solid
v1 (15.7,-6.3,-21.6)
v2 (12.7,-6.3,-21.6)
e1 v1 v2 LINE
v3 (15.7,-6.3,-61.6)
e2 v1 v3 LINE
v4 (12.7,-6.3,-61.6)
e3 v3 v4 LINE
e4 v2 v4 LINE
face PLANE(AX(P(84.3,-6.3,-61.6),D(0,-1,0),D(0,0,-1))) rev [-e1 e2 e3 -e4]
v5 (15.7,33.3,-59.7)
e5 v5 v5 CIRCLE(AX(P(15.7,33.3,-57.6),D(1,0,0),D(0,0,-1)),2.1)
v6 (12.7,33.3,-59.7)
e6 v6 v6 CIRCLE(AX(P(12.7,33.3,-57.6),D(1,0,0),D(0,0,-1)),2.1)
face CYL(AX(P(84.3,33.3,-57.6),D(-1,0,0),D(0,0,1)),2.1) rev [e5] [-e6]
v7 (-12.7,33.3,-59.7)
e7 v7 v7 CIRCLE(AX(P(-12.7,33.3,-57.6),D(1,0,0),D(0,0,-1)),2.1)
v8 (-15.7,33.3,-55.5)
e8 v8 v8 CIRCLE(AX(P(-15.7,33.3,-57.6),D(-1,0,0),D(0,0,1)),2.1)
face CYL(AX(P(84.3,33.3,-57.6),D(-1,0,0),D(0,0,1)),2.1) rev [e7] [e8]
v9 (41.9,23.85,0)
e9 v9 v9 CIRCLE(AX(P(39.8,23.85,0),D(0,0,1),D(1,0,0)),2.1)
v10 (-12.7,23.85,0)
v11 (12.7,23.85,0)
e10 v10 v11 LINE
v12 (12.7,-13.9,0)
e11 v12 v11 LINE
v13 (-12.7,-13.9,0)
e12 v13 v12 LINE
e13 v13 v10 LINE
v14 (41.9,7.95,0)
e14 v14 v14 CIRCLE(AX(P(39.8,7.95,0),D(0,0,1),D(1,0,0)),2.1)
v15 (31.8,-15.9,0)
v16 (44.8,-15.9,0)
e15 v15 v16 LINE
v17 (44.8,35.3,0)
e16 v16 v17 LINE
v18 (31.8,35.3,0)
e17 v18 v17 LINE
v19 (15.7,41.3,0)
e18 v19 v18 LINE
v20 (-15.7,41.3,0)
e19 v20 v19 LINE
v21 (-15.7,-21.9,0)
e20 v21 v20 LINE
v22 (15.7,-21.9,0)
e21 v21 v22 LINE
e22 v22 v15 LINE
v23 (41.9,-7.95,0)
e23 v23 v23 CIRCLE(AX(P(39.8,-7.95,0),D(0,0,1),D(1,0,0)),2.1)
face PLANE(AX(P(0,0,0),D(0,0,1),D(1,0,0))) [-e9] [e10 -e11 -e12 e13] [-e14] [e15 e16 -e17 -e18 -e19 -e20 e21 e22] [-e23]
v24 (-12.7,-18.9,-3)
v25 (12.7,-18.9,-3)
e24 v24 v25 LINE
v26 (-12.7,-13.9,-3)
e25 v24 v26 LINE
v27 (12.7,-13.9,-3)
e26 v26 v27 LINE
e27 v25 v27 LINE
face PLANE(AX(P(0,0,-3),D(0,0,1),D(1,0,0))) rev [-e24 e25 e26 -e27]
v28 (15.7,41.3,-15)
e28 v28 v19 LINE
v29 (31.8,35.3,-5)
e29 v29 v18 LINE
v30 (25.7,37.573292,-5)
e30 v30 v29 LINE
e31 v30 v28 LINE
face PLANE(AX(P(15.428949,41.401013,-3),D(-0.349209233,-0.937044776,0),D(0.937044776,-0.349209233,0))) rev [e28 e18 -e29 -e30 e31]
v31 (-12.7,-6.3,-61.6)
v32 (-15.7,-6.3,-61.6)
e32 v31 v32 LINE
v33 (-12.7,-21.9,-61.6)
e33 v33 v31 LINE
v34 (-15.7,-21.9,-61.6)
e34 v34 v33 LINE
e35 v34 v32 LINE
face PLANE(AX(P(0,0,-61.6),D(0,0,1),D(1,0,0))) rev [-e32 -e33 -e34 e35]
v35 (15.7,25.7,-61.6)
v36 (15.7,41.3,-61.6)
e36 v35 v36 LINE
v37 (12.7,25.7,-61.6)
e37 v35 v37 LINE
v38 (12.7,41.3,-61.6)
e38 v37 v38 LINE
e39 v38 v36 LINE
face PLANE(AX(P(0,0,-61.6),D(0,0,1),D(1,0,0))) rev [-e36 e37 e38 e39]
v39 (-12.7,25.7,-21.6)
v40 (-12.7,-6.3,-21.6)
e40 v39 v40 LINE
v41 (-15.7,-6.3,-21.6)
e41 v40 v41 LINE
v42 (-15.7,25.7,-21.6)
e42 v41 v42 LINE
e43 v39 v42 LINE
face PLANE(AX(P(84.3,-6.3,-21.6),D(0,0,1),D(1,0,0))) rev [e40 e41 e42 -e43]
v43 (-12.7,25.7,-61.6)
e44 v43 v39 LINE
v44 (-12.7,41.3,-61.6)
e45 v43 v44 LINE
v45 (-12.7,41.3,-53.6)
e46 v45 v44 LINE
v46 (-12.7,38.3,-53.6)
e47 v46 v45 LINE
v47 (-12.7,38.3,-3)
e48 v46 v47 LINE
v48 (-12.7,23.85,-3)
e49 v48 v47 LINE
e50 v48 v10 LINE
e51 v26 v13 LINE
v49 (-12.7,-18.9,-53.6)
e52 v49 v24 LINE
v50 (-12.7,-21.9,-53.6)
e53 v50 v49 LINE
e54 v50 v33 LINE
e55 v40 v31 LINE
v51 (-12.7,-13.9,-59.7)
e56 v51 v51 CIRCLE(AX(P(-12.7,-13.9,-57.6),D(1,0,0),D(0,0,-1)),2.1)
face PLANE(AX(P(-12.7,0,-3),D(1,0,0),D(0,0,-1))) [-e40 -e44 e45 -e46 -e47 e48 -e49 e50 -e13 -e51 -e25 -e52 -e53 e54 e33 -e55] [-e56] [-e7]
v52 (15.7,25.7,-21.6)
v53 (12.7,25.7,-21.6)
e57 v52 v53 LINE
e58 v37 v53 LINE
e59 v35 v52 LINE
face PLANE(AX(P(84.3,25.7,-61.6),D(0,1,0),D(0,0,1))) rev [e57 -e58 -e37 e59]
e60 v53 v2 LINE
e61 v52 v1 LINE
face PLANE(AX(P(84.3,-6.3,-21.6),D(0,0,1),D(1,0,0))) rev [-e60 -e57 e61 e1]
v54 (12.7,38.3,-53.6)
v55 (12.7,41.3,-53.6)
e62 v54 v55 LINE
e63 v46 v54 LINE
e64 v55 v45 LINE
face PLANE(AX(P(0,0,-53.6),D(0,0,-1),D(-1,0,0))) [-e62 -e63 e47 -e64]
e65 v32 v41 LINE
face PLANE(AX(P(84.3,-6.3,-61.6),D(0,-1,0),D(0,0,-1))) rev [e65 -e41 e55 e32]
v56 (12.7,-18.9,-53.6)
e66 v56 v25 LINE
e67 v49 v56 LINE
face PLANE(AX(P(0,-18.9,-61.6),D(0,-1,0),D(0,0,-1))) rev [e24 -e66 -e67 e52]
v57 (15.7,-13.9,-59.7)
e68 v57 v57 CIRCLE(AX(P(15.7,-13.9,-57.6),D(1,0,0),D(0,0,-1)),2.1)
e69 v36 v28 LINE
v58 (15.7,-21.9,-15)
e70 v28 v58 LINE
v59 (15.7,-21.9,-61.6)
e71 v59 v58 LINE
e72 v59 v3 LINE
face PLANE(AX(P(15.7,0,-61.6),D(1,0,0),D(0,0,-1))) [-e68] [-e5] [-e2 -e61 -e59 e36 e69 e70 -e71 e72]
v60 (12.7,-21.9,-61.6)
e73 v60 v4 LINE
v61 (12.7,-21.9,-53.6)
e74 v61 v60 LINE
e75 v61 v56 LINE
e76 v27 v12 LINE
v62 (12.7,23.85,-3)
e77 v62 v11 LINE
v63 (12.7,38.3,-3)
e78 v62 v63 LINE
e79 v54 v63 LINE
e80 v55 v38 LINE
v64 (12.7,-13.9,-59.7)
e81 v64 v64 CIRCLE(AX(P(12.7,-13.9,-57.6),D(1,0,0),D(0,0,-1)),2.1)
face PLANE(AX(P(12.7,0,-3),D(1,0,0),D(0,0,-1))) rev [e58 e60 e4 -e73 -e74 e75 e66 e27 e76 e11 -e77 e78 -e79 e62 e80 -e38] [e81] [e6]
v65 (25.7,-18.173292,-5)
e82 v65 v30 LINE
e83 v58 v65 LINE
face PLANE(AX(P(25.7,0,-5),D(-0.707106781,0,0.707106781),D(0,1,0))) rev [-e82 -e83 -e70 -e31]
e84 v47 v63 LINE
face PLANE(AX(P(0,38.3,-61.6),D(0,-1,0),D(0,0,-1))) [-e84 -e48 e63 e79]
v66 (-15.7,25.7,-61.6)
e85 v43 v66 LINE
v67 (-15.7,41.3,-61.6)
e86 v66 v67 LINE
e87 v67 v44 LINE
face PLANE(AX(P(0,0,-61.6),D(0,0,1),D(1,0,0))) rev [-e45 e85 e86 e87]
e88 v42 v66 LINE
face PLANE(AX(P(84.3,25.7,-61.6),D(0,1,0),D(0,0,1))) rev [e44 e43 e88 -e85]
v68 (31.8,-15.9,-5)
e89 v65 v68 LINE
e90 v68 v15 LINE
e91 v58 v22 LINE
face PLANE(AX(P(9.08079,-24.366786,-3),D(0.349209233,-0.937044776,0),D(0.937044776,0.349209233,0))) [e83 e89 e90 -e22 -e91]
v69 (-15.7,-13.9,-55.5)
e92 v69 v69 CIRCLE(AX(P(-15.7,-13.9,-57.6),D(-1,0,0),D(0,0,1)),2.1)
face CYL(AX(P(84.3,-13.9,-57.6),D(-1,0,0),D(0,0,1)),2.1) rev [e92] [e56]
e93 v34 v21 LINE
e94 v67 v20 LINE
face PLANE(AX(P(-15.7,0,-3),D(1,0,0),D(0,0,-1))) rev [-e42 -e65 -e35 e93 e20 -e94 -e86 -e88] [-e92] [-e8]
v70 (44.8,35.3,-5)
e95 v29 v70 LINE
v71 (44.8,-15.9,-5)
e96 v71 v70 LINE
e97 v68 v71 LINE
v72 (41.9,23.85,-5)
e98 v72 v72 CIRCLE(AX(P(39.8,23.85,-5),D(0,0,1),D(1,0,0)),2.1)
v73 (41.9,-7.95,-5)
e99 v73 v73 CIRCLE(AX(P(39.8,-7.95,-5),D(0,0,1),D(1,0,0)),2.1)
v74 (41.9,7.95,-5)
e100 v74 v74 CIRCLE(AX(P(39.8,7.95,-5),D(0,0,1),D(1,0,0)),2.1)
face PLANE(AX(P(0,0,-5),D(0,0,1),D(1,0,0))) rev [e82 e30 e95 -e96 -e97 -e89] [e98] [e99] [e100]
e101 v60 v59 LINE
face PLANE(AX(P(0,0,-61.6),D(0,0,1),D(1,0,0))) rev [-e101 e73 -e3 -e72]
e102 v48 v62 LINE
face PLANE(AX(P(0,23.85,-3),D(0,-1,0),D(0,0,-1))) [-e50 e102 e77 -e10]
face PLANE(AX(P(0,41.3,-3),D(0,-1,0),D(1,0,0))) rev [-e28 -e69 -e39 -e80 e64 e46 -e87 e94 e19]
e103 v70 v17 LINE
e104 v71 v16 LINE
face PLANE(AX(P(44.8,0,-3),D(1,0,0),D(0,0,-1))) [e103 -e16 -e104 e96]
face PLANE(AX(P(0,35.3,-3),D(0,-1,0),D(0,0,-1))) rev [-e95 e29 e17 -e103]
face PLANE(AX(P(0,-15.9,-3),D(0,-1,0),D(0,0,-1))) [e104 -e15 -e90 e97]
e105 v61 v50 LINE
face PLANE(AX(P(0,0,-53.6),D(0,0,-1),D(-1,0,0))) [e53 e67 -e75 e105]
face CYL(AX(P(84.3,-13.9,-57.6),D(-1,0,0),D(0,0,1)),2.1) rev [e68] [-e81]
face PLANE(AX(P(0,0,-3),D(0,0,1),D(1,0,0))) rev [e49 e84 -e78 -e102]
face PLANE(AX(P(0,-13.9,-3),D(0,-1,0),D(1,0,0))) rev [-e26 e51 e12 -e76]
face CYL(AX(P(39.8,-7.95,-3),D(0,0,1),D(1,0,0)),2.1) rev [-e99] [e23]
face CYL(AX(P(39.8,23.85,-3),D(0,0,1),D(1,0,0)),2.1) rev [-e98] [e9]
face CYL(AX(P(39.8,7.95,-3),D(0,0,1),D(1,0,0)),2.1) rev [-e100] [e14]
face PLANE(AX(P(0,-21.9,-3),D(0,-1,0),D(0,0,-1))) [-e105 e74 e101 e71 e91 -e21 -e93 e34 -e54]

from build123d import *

# Parameters (mm, degrees)
SKETCH1_W           = 51.2
SKETCH1_H           = 13
SKETCH1_R           = 2.1
SKETCH1_W_2         = 5
SKETCH1_H_2         = 25.4
BOSS_EXTRUDE1_DEPTH = 3
BOSS_EXTRUDE2_DEPTH = 61.6
SKETCH2_R           = 2.1
SKETCH2_W           = 32
SKETCH2_H           = 40
CUT_EXTRUDE1_DEPTH  = 100
SKETCH3_W           = 63.2
SKETCH3_H           = 25.4
CUT_EXTRUDE2_DEPTH  = 8
SKETCH1_5_W         = 51.2
SKETCH1_5_H         = 13
SKETCH1_5_R         = 2.1
BOSS_EXTRUDE3_DEPTH = 5
CHAMFER1_SIZE       = 10


with BuildPart() as part:
    # Sketch1 → Boss-Extrude1 (new body)
    # profile 1 of 9: a face of its own
    with BuildSketch(Plane(origin=(0, 0, 0), x_dir=(0, 1, 0), z_dir=(0, 0, 1))):
        with BuildLine():
            Line((41.3, -15.7), (27.654113618, -15.7))
            ThreePointArc((27.654113618, -15.7), (15.999687497, -27.481812167), (0, -31.8))
            Line((0, -31.8), (35.3, -31.8))
            Line((35.3, -31.8), (41.3, -15.7))
        make_face()
    # profile 2 of 9: a face of its own
    with BuildSketch(Plane(origin=(0, 0, 0), x_dir=(0, 1, 0), z_dir=(0, 0, 1))):
        with BuildLine():
            Line((27.654113618, -15.7), (-21.9, -15.7))
            Line((-21.9, -15.7), (-17.974836126, -26.232523063))
            ThreePointArc((-17.974836126, -26.232523063), (-9.408660016, -30.376259097), (0, -31.8))
            ThreePointArc((0, -31.8), (15.999687497, -27.481812167), (27.654113618, -15.7))
        make_face()
    # profile 3 of 9: a face of its own
    with BuildSketch(Plane(origin=(0, 0, 0), x_dir=(0, 1, 0), z_dir=(0, 0, 1))):
        with BuildLine():
            ThreePointArc((0, -31.8), (-9.408660016, -30.376259097), (-17.974836126, -26.232523063))
            Line((-17.974836126, -26.232523063), (-15.9, -31.8))
            Line((-15.9, -31.8), (0, -31.8))
        make_face()
    # profile 4 of 9: a face of its own
    with BuildSketch(Plane(origin=(0, 0, 0), x_dir=(0, 1, 0), z_dir=(0, 0, 1))):
        with Locations((9.7, -38.3)):
            Rectangle(SKETCH1_W, SKETCH1_H)
        with Locations(Location((23.85, -39.8, 0), (0, 0, 270))):
            Circle(SKETCH1_R, mode=Mode.SUBTRACT)
        with Locations(Location((7.95, -39.8, 0), (0, 0, 270))):
            Circle(SKETCH1_R, mode=Mode.SUBTRACT)
        with Locations(Location((-7.95, -39.8, 0), (0, 0, 270))):
            Circle(SKETCH1_R, mode=Mode.SUBTRACT)
    # profile 5 of 9: a face of its own
    with BuildSketch(Plane(origin=(0, 0, 0), x_dir=(0, 1, 0), z_dir=(0, 0, 1))):
        with BuildLine():
            ThreePointArc((29.153901969, -12.7), (28.443587304, -14.219786963), (27.654113618, -15.7))
            Line((27.654113618, -15.7), (41.3, -15.7))
            Line((41.3, -15.7), (41.3, 15.7))
            Line((41.3, 15.7), (27.654113618, 15.7))
            ThreePointArc((27.654113618, 15.7), (28.443587304, 14.219786963), (29.153901969, 12.7))
            Line((29.153901969, 12.7), (38.3, 12.7))
            Line((38.3, 12.7), (38.3, -12.7))
            Line((38.3, -12.7), (29.153901969, -12.7))
        make_face()
    # profile 6 of 9: a face of its own
    with BuildSketch(Plane(origin=(0, 0, 0), x_dir=(0, 1, 0), z_dir=(0, 0, 1))):
        with BuildLine():
            Line((-21.9, 15.7), (-21.9, -15.7))
            Line((-21.9, -15.7), (27.654113618, -15.7))
            ThreePointArc((27.654113618, -15.7), (28.443587304, -14.219786963), (29.153901969, -12.7))
            Line((29.153901969, -12.7), (23.85, -12.7))
            Line((23.85, -12.7), (-13.9, -12.7))
            Line((-13.9, -12.7), (-18.9, -12.7))
            Line((-18.9, -12.7), (-18.9, 12.7))
            Line((-18.9, 12.7), (-13.9, 12.7))
            Line((-13.9, 12.7), (23.85, 12.7))
            Line((23.85, 12.7), (29.153901969, 12.7))
            ThreePointArc((29.153901969, 12.7), (28.443587304, 14.219786963), (27.654113618, 15.7))
            Line((27.654113618, 15.7), (-21.9, 15.7))
        make_face()
    # profile 7 of 9: a face of its own
    with BuildSketch(Plane(origin=(0, 0, 0), x_dir=(0, 1, 0), z_dir=(0, 0, 1))):
        with BuildLine():
            Line((23.85, -12.7), (29.153901969, -12.7))
            ThreePointArc((29.153901969, -12.7), (31.131447787, -6.486367142), (31.8, 0))
            ThreePointArc((31.8, 0), (31.131447787, 6.486367142), (29.153901969, 12.7))
            Line((29.153901969, 12.7), (23.85, 12.7))
            Line((23.85, 12.7), (23.85, -12.7))
        make_face()
    # profile 8 of 9: a face of its own
    with BuildSketch(Plane(origin=(0, 0, 0), x_dir=(0, 1, 0), z_dir=(0, 0, 1))):
        with BuildLine():
            ThreePointArc((31.8, 0), (31.131447787, -6.486367142), (29.153901969, -12.7))
            Line((29.153901969, -12.7), (38.3, -12.7))
            Line((38.3, -12.7), (38.3, 12.7))
            Line((38.3, 12.7), (29.153901969, 12.7))
            ThreePointArc((29.153901969, 12.7), (31.131447787, 6.486367142), (31.8, 0))
        make_face()
    # profile 9 of 9: a face of its own
    with BuildSketch(Plane(origin=(0, 0, 0), x_dir=(0, 1, 0), z_dir=(0, 0, 1))):
        with Locations((-16.4, 0)):
            Rectangle(SKETCH1_W_2, SKETCH1_H_2)
    extrude(amount=-BOSS_EXTRUDE1_DEPTH)

    # Sketch1<4> → Boss-Extrude2 (add)
    with BuildSketch(Plane(origin=(0, 0, 0), x_dir=(0, 1, 0), z_dir=(0, 0, 1))):
        with BuildLine():
            ThreePointArc((29.153901969, -12.7), (28.443587304, -14.219786963), (27.654113618, -15.7))
            Line((27.654113618, -15.7), (41.3, -15.7))
            Line((41.3, -15.7), (41.3, 15.7))
            Line((41.3, 15.7), (27.654113618, 15.7))
            ThreePointArc((27.654113618, 15.7), (28.443587304, 14.219786963), (29.153901969, 12.7))
            Line((29.153901969, 12.7), (38.3, 12.7))
            Line((38.3, 12.7), (38.3, -12.7))
            Line((38.3, -12.7), (29.153901969, -12.7))
        make_face()
        with BuildLine():
            Line((-21.9, 15.7), (-21.9, -15.7))
            Line((-21.9, -15.7), (27.654113618, -15.7))
            ThreePointArc((27.654113618, -15.7), (28.443587304, -14.219786963), (29.153901969, -12.7))
            Line((29.153901969, -12.7), (23.85, -12.7))
            Line((23.85, -12.7), (-13.9, -12.7))
            Line((-13.9, -12.7), (-18.9, -12.7))
            Line((-18.9, -12.7), (-18.9, 12.7))
            Line((-18.9, 12.7), (-13.9, 12.7))
            Line((-13.9, 12.7), (23.85, 12.7))
            Line((23.85, 12.7), (29.153901969, 12.7))
            ThreePointArc((29.153901969, 12.7), (28.443587304, 14.219786963), (27.654113618, 15.7))
            Line((27.654113618, 15.7), (-21.9, 15.7))
        make_face()
    extrude(amount=-BOSS_EXTRUDE2_DEPTH)

    # Sketch2 → Cut-Extrude1 (cut)
    with BuildSketch(Plane(origin=(-15.7, 0, 0), x_dir=(0, -1, 0), z_dir=(-1, 0, 0))):
        with Locations(Location((13.9, -57.6, 0), (0, 0, 270))):
            Circle(SKETCH2_R)
        with Locations(Location((-33.3, -57.6, 0), (0, 0, 270))):
            Circle(SKETCH2_R)
        with Locations((-9.7, -41.6)):
            Rectangle(SKETCH2_W, SKETCH2_H)
    extrude(amount=-CUT_EXTRUDE1_DEPTH, mode=Mode.SUBTRACT)

    # Sketch3 → Cut-Extrude2 (cut)
    with BuildSketch(Plane.YX.offset(61.6)):
        with Locations((9.7, 0)):
            Rectangle(SKETCH3_W, SKETCH3_H)
    extrude(amount=-CUT_EXTRUDE2_DEPTH, mode=Mode.SUBTRACT)

    # Sketch1<5> → Boss-Extrude3 (add)
    # profile 1 of 4: a face of its own
    with BuildSketch(Plane(origin=(0, 0, 0), x_dir=(0, 1, 0), z_dir=(0, 0, 1))):
        with BuildLine():
            Line((27.654113618, -15.7), (-21.9, -15.7))
            Line((-21.9, -15.7), (-17.974836126, -26.232523063))
            ThreePointArc((-17.974836126, -26.232523063), (-9.408660016, -30.376259097), (0, -31.8))
            ThreePointArc((0, -31.8), (15.999687497, -27.481812167), (27.654113618, -15.7))
        make_face()
    # profile 2 of 4: a face of its own
    with BuildSketch(Plane(origin=(0, 0, 0), x_dir=(0, 1, 0), z_dir=(0, 0, 1))):
        with BuildLine():
            Line((41.3, -15.7), (27.654113618, -15.7))
            ThreePointArc((27.654113618, -15.7), (15.999687497, -27.481812167), (0, -31.8))
            Line((0, -31.8), (35.3, -31.8))
            Line((35.3, -31.8), (41.3, -15.7))
        make_face()
    # profile 3 of 4: a face of its own
    with BuildSketch(Plane(origin=(0, 0, 0), x_dir=(0, 1, 0), z_dir=(0, 0, 1))):
        with BuildLine():
            ThreePointArc((0, -31.8), (-9.408660016, -30.376259097), (-17.974836126, -26.232523063))
            Line((-17.974836126, -26.232523063), (-15.9, -31.8))
            Line((-15.9, -31.8), (0, -31.8))
        make_face()
    # profile 4 of 4: a face of its own
    with BuildSketch(Plane(origin=(0, 0, 0), x_dir=(0, 1, 0), z_dir=(0, 0, 1))):
        with Locations((9.7, -38.3)):
            Rectangle(SKETCH1_5_W, SKETCH1_5_H)
        with Locations(Location((23.85, -39.8, 0), (0, 0, 270))):
            Circle(SKETCH1_5_R, mode=Mode.SUBTRACT)
        with Locations(Location((7.95, -39.8, 0), (0, 0, 270))):
            Circle(SKETCH1_5_R, mode=Mode.SUBTRACT)
        with Locations(Location((-7.95, -39.8, 0), (0, 0, 270))):
            Circle(SKETCH1_5_R, mode=Mode.SUBTRACT)
    extrude(amount=-BOSS_EXTRUDE3_DEPTH)

    # Chamfer1
    # the kernel refuses this chamfer: 10 mm, written as the material it adds along each edge
    with BuildSketch(Plane(origin=(15.7, -21.9, -5), x_dir=(-0.027495876610586317, 0, -0.9996219169112968), z_dir=(0, 1, 0))) as chamfer1_piece_1_section:
        Polygon((CHAMFER1_SIZE * 0.999621916911, -CHAMFER1_SIZE * 0.0274958766106), (-CHAMFER1_SIZE * 0.0274958766106, -CHAMFER1_SIZE * 0.999621916911), (0, 0), align=None)
    chamfer1_piece_1 = extrude(amount=63.2, mode=Mode.PRIVATE)
    chamfer1_piece_1 = split(chamfer1_piece_1, bisect_by=Plane(origin=(28.867881951, -16.992714801, -8.339298449), z_dir=(-0.34920923314434543, 0.9370447756039934, 0)), keep=Keep.TOP, mode=Mode.PRIVATE)
    chamfer1_piece_1 = split(chamfer1_piece_1, bisect_by=Plane(origin=(28.867881951, 36.392714801, -8.339298449), z_dir=(-0.3492092331443461, -0.9370447756039931, 0)), keep=Keep.TOP, mode=Mode.PRIVATE)
    add(chamfer1_piece_1)


solid = part.part
